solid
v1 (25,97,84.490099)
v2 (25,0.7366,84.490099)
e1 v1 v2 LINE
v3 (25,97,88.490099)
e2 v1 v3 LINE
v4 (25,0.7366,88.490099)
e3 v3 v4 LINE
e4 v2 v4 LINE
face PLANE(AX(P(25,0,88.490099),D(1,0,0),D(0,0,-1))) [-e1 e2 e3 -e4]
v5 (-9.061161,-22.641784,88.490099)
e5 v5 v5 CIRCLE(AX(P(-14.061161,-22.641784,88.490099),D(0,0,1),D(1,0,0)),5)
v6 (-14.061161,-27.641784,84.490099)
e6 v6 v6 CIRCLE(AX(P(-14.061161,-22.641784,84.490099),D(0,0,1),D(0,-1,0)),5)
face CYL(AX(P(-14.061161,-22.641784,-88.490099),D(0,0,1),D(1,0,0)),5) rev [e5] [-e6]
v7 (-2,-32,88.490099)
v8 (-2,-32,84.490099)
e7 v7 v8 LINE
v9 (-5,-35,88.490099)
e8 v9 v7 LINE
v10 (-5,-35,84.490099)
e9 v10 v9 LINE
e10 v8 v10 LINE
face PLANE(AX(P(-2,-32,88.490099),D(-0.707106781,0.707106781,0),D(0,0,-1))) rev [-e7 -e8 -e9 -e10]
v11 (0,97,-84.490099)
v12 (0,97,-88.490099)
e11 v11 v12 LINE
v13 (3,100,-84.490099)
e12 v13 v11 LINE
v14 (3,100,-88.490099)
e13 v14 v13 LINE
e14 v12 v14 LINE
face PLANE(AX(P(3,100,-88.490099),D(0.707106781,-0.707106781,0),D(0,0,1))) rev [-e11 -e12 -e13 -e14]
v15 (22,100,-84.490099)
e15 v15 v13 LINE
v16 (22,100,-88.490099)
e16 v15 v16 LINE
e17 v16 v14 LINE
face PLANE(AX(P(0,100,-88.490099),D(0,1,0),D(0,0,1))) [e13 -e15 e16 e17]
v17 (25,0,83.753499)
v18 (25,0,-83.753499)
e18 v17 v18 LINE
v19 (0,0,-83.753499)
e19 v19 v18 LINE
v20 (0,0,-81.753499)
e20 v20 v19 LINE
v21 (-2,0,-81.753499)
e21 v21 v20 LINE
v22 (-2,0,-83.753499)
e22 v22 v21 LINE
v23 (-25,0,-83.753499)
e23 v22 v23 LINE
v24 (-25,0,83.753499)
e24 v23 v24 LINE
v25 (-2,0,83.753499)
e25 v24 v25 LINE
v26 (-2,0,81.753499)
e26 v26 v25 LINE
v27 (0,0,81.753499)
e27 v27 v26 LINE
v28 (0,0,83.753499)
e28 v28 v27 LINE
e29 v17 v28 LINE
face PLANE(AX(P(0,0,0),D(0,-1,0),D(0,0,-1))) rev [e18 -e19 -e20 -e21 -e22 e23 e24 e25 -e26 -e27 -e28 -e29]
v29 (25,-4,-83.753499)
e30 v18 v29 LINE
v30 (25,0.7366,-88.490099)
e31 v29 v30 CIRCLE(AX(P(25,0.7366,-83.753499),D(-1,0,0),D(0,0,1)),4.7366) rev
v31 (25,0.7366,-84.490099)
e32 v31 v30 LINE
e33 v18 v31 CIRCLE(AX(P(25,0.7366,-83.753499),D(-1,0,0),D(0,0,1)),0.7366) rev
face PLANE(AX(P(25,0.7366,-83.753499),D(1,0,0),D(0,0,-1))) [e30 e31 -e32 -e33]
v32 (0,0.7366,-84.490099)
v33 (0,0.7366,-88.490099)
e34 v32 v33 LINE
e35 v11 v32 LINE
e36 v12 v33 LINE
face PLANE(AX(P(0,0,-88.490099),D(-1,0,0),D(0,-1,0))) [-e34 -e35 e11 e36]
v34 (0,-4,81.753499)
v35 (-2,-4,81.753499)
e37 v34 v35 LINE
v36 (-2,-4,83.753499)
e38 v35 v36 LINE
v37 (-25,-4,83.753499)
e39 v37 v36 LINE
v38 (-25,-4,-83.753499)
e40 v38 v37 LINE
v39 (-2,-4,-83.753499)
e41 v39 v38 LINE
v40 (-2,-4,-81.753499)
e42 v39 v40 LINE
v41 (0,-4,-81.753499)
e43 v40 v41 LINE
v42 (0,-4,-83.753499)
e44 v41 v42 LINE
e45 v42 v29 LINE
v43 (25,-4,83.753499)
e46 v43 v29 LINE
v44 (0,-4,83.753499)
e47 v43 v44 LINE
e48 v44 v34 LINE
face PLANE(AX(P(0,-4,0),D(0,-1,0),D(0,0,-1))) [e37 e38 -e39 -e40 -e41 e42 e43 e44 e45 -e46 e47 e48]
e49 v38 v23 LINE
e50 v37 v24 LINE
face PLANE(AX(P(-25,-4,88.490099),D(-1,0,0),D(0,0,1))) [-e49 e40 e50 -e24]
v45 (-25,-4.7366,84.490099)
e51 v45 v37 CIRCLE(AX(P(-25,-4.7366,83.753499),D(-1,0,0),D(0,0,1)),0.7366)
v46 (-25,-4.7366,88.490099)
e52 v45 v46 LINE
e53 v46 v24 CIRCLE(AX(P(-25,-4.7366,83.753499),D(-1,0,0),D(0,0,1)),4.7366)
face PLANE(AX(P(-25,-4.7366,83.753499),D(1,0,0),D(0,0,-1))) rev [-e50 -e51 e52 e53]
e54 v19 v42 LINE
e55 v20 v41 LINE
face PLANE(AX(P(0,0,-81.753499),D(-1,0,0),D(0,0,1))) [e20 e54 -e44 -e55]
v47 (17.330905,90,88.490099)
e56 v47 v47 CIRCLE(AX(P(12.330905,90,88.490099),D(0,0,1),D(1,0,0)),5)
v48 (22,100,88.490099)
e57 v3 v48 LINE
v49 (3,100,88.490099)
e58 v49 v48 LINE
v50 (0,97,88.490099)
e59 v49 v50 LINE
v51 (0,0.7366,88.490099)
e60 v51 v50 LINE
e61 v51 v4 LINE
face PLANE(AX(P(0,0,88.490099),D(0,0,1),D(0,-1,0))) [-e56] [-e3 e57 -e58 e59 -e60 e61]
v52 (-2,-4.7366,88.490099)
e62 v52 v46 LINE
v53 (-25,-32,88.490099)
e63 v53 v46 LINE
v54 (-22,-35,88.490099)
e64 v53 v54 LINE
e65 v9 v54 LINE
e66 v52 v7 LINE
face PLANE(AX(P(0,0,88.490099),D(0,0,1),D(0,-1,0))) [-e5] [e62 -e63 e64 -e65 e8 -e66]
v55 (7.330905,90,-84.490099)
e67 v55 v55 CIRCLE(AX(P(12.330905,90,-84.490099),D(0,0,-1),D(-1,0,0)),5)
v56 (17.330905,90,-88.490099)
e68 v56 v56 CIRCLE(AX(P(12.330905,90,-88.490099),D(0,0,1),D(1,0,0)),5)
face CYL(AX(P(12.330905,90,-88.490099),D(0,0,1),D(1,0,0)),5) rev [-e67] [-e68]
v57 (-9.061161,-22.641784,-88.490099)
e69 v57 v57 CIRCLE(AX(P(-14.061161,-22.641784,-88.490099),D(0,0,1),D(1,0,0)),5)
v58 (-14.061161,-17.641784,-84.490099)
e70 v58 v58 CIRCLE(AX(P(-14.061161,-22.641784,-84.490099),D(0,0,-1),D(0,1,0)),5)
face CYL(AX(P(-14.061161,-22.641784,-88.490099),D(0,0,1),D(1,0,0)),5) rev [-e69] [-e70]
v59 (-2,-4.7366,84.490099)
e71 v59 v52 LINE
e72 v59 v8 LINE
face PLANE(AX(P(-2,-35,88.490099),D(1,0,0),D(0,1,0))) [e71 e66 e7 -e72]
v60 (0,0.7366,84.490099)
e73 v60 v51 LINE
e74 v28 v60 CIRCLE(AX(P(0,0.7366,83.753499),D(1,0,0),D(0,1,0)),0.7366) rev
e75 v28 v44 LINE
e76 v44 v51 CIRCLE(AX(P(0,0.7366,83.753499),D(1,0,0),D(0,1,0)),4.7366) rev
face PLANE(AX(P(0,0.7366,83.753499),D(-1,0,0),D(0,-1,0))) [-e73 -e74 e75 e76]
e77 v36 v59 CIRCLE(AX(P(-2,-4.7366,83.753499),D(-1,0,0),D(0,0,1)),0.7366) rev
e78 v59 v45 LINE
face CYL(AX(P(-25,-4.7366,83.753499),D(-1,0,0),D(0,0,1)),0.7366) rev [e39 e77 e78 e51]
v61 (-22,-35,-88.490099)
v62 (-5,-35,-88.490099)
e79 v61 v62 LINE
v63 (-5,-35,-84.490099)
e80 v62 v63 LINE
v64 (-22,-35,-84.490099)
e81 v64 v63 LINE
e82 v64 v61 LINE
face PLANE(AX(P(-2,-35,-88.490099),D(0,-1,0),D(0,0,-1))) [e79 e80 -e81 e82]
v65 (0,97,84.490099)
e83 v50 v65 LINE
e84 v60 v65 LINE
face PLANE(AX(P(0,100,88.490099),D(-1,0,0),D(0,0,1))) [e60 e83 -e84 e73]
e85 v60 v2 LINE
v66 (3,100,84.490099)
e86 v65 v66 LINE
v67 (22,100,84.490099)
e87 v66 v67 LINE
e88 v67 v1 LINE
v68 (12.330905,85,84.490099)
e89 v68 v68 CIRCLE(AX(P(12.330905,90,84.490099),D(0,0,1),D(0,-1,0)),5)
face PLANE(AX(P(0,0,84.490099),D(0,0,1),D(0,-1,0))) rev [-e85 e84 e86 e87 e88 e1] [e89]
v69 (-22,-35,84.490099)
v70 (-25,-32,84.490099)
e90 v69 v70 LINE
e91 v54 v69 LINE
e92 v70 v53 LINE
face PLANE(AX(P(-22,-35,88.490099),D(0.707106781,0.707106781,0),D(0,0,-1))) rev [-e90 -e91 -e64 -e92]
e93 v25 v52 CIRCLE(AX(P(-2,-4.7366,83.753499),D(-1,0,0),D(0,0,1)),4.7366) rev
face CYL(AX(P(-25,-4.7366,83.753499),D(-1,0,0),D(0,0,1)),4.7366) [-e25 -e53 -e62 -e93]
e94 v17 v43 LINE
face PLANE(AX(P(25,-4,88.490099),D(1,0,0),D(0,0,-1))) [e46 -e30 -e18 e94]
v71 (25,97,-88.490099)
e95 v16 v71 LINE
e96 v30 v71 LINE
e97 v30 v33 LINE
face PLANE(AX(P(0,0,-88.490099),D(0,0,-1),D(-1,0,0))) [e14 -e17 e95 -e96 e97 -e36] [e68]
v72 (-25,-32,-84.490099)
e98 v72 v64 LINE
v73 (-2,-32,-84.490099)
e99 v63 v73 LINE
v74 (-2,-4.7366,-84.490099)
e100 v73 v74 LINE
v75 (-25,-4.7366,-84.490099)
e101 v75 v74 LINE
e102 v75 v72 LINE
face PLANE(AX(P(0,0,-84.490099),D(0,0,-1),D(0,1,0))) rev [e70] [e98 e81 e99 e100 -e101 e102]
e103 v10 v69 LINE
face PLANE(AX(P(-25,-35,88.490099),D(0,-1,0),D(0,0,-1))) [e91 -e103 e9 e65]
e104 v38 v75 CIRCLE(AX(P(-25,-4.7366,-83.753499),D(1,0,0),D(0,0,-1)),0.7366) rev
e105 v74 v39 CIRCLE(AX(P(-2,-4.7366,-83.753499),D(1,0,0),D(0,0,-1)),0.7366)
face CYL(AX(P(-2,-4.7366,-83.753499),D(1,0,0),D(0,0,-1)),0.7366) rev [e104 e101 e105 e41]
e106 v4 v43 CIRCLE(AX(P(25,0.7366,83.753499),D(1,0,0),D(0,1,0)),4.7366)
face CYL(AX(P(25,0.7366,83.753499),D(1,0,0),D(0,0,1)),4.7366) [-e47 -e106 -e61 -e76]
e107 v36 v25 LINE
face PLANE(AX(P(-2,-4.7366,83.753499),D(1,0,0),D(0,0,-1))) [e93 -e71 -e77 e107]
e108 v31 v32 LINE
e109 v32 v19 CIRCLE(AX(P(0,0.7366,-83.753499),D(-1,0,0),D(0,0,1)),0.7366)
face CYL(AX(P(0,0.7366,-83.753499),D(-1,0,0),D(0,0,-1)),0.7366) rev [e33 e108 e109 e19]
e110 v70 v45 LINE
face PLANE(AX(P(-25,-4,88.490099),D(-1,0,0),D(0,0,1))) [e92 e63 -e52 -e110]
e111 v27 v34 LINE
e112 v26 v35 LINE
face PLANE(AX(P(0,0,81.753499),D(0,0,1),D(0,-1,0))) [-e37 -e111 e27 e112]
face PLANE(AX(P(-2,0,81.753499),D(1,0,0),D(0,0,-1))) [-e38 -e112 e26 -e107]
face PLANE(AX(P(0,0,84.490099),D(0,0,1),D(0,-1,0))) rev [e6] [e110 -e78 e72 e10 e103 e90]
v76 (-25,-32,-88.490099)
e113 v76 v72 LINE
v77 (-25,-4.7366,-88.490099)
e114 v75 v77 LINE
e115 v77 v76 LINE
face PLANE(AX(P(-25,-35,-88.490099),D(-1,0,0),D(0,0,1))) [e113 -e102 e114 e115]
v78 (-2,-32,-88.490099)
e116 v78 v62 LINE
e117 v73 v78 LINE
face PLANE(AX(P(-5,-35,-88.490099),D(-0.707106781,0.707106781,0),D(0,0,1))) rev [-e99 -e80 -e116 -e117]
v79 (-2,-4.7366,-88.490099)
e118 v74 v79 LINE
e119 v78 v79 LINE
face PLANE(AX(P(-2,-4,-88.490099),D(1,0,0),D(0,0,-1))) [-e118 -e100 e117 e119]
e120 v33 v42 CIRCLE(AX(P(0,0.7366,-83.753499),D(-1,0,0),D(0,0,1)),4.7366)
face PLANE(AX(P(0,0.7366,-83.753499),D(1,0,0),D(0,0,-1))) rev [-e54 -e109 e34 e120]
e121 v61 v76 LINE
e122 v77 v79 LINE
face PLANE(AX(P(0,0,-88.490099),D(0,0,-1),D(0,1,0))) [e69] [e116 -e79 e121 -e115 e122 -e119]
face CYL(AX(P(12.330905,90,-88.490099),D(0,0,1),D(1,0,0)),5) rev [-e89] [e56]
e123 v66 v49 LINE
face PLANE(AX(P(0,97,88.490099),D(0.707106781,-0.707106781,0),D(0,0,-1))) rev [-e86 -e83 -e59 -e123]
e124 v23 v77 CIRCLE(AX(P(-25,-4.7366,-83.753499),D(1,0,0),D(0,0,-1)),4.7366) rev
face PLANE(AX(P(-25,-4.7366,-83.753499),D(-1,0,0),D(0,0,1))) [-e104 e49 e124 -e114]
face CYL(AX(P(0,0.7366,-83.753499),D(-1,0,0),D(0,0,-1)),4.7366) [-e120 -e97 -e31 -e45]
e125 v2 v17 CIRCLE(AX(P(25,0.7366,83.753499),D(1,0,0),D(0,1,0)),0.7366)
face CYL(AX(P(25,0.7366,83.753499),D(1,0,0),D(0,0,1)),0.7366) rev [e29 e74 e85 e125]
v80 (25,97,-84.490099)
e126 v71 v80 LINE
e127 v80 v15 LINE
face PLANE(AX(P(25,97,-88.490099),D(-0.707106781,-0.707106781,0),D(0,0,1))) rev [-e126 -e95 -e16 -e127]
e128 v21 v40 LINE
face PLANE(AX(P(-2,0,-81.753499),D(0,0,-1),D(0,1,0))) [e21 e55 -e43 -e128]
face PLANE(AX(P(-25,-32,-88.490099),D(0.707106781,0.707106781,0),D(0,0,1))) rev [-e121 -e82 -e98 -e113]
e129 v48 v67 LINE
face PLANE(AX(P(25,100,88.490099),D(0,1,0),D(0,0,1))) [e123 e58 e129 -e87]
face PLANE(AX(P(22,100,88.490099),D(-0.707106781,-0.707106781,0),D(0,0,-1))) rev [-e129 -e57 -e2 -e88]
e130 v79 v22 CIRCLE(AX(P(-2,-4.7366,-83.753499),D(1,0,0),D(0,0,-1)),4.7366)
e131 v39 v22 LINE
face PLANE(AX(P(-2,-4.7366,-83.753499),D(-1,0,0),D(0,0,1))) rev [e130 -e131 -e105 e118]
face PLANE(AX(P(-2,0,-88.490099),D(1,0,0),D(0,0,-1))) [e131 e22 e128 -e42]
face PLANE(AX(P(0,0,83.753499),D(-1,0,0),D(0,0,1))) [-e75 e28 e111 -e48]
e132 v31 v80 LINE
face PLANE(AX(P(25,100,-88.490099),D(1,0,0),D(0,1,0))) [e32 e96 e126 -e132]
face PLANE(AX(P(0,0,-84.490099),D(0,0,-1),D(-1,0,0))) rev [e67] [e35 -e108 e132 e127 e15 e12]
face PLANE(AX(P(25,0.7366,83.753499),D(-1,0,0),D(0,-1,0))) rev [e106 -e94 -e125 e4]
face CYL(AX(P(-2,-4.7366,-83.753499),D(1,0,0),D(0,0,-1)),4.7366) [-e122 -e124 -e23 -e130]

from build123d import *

# Parameters (mm, degrees)
SKETCH_1_W                        = 50
SKETCH_1_H                        = 176.98019802
SM_BASE_FLANGE_1_DEPTH            = 4
SM_EDGE_FLANGE_1_STRIP_W          = 17.4732
SM_EDGE_FLANGE_1_STRIP_H          = 4
SM_EDGE_FLANGE_1_STRIP_CUT_DEPTH  = 25
SM_EDGE_FLANGE_1_RELIEF_W         = 19.4732
SM_EDGE_FLANGE_1_RELIEF_H         = 2
SM_EDGE_FLANGE_1_RELIEF_CUT_DEPTH = 4
SM_EDGE_FLANGE_1_DEPTH            = 25
SM_EDGE_FLANGE_2_STRIP_W          = 17.4732
SM_EDGE_FLANGE_2_STRIP_H          = 4
SM_EDGE_FLANGE_2_STRIP_CUT_DEPTH  = 25
SM_EDGE_FLANGE_2_RELIEF_W         = 19.4732
SM_EDGE_FLANGE_2_RELIEF_H         = 2
SM_EDGE_FLANGE_2_RELIEF_CUT_DEPTH = 4
SM_EDGE_FLANGE_2_DEPTH            = 25
SM_EDGE_FLANGE_3_STRIP_W          = 17.4732
SM_EDGE_FLANGE_3_STRIP_H          = 4
SM_EDGE_FLANGE_3_STRIP_CUT_DEPTH  = 23
SM_EDGE_FLANGE_3_DEPTH            = 23
SM_EDGE_FLANGE_4_STRIP_W          = 17.4732
SM_EDGE_FLANGE_4_STRIP_H          = 4
SM_EDGE_FLANGE_4_STRIP_CUT_DEPTH  = 23
SM_EDGE_FLANGE_4_DEPTH            = 23
SKETCH_18_R                       = 5
CUT_EXTRUDE_1_DEPTH               = 205.809644527
SKETCH_19_R                       = 5
CUT_EXTRUDE_2_DEPTH               = 205.809644527
CHAMFER_1_SIZE                    = 3
CHAMFER_2_SIZE                    = 3


# Sheet-metal steps are written as plain solids
with BuildPart() as part:
    # Sketch 1 → 基体-法兰1 (new body)
    with BuildSketch(Plane(origin=(0, 0, 0), x_dir=(1, 0, 0), z_dir=(0, 1, 0))):
        Rectangle(SKETCH_1_W, SKETCH_1_H)
    extrude(amount=-SM_BASE_FLANGE_1_DEPTH)

    # 边线-法兰1 strip (across the edge) → 边线-法兰1 strip cut (cut)
    with BuildSketch(Plane(origin=(25, 0, -88.49009901), x_dir=(0, 0, 1), z_dir=(-1, 0, 0))):
        with Locations((-4, -2)):
            Rectangle(SM_EDGE_FLANGE_1_STRIP_W, SM_EDGE_FLANGE_1_STRIP_H)
    extrude(amount=SM_EDGE_FLANGE_1_STRIP_CUT_DEPTH, mode=Mode.SUBTRACT)

    # 边线-法兰1 relief (on the sheet) → 边线-法兰1 relief cut (cut)
    with BuildSketch(Plane(origin=(25, 0, -83.75349901), x_dir=(0, 0, 1), z_dir=(0, 1, 0))):
        with Locations((-7.7366, -26)):
            Rectangle(SM_EDGE_FLANGE_1_RELIEF_W, SM_EDGE_FLANGE_1_RELIEF_H)
    extrude(amount=-SM_EDGE_FLANGE_1_RELIEF_CUT_DEPTH, mode=Mode.SUBTRACT)

    # 边线-法兰1 section (across the edge) → 边线-法兰1 (add)
    with BuildSketch(Plane(origin=(25, 0, -88.49009901), x_dir=(0, 0, 1), z_dir=(-1, 0, 0))):
        with BuildLine():
            Line((0, 0.7366), (0, 100))
            Line((0, 100), (4, 100))
            Line((4, 100), (4, 0.7366))
            ThreePointArc((4, 0.7366), (4.215745145, 0.215745145), (4.7366, 0))
            Line((4.7366, 0), (4.7366, -4))
            ThreePointArc((4.7366, -4), (1.38731802, -2.61268198), (0, 0.7366))
        make_face()
    extrude(amount=SM_EDGE_FLANGE_1_DEPTH)

    # 边线-法兰2 strip (across the edge) → 边线-法兰2 strip cut (cut)
    with BuildSketch(Plane(origin=(0, 0, 88.49009901), x_dir=(0, 0, -1), z_dir=(1, 0, 0))):
        with Locations((-4, -2)):
            Rectangle(SM_EDGE_FLANGE_2_STRIP_W, SM_EDGE_FLANGE_2_STRIP_H)
    extrude(amount=SM_EDGE_FLANGE_2_STRIP_CUT_DEPTH, mode=Mode.SUBTRACT)

    # 边线-法兰2 relief (on the sheet) → 边线-法兰2 relief cut (cut)
    with BuildSketch(Plane(origin=(0, 0, 83.75349901), x_dir=(0, 0, -1), z_dir=(0, 1, 0))):
        with Locations((-7.7366, 1)):
            Rectangle(SM_EDGE_FLANGE_2_RELIEF_W, SM_EDGE_FLANGE_2_RELIEF_H)
    extrude(amount=-SM_EDGE_FLANGE_2_RELIEF_CUT_DEPTH, mode=Mode.SUBTRACT)

    # 边线-法兰2 section (across the edge) → 边线-法兰2 (add)
    with BuildSketch(Plane(origin=(0, 0, 88.49009901), x_dir=(0, 0, -1), z_dir=(1, 0, 0))):
        with BuildLine():
            Line((0, 0.7366), (0, 100))
            Line((0, 100), (4, 100))
            Line((4, 100), (4, 0.7366))
            ThreePointArc((4, 0.7366), (4.215745145, 0.215745145), (4.7366, 0))
            Line((4.7366, 0), (4.7366, -4))
            ThreePointArc((4.7366, -4), (1.38731802, -2.61268198), (0, 0.7366))
        make_face()
    extrude(amount=SM_EDGE_FLANGE_2_DEPTH)

    # 边线-法兰3 strip (across the edge) → 边线-法兰3 strip cut (cut)
    with BuildSketch(Plane(origin=(-2, -4, 88.49009901), x_dir=(0, 0, -1), z_dir=(-1, 0, 0))):
        with Locations((-4, -2)):
            Rectangle(SM_EDGE_FLANGE_3_STRIP_W, SM_EDGE_FLANGE_3_STRIP_H)
    extrude(amount=SM_EDGE_FLANGE_3_STRIP_CUT_DEPTH, mode=Mode.SUBTRACT)

    # 边线-法兰3 section (across the edge) → 边线-法兰3 (add)
    with BuildSketch(Plane(origin=(-2, -4, 88.49009901), x_dir=(0, 0, -1), z_dir=(-1, 0, 0))):
        with BuildLine():
            Line((0, 0.7366), (0, 31))
            Line((0, 31), (4, 31))
            Line((4, 31), (4, 0.7366))
            ThreePointArc((4, 0.7366), (4.215745145, 0.215745145), (4.7366, 0))
            Line((4.7366, 0), (4.7366, -4))
            ThreePointArc((4.7366, -4), (1.38731802, -2.61268198), (0, 0.7366))
        make_face()
    extrude(amount=SM_EDGE_FLANGE_3_DEPTH)

    # 边线-法兰4 strip (across the edge) → 边线-法兰4 strip cut (cut)
    with BuildSketch(Plane(origin=(-25, -4, -88.49009901), x_dir=(0, 0, 1), z_dir=(1, 0, 0))):
        with Locations((-4, -2)):
            Rectangle(SM_EDGE_FLANGE_4_STRIP_W, SM_EDGE_FLANGE_4_STRIP_H)
    extrude(amount=SM_EDGE_FLANGE_4_STRIP_CUT_DEPTH, mode=Mode.SUBTRACT)

    # 边线-法兰4 section (across the edge) → 边线-法兰4 (add)
    with BuildSketch(Plane(origin=(-25, -4, -88.49009901), x_dir=(0, 0, 1), z_dir=(1, 0, 0))):
        with BuildLine():
            Line((0, 0.7366), (0, 31))
            Line((0, 31), (4, 31))
            Line((4, 31), (4, 0.7366))
            ThreePointArc((4, 0.7366), (4.215745145, 0.215745145), (4.7366, 0))
            Line((4.7366, 0), (4.7366, -4))
            ThreePointArc((4.7366, -4), (1.38731802, -2.61268198), (0, 0.7366))
        make_face()
    extrude(amount=SM_EDGE_FLANGE_4_DEPTH)

    # 草图18 → 切除-拉伸1 (cut, through all)
    with BuildSketch(Plane.XY.offset(88.49009901)):
        with Locations((-14.061160699, -22.641783907)):
            Circle(SKETCH_18_R)
    extrude(amount=-CUT_EXTRUDE_1_DEPTH, mode=Mode.SUBTRACT)

    # 草图19 → 切除-拉伸2 (cut, through all)
    with BuildSketch(Plane.XY.offset(88.49009901)):
        with Locations((12.330904878, 90)):
            Circle(SKETCH_19_R)
    extrude(amount=-CUT_EXTRUDE_2_DEPTH, mode=Mode.SUBTRACT)

    # 倒角1
    chamfer_1_edges = [part.edges().sort_by_distance(p)[0] for p in [
        (-2, -35, 86.49009901),
        (-25, -35, 86.49009901),
        (-25, -35, -86.49009901),
        (-2, -35, -86.49009901),
    ]]
    chamfer(chamfer_1_edges, length=CHAMFER_1_SIZE)

    # 倒角2
    chamfer_2_edges = [part.edges().sort_by_distance(p)[0] for p in [
        (25, 100, -86.49009901),
        (0, 100, -86.49009901),
        (0, 100, 86.49009901),
        (25, 100, 86.49009901),
    ]]
    chamfer(chamfer_2_edges, length=CHAMFER_2_SIZE)


solid = part.part
